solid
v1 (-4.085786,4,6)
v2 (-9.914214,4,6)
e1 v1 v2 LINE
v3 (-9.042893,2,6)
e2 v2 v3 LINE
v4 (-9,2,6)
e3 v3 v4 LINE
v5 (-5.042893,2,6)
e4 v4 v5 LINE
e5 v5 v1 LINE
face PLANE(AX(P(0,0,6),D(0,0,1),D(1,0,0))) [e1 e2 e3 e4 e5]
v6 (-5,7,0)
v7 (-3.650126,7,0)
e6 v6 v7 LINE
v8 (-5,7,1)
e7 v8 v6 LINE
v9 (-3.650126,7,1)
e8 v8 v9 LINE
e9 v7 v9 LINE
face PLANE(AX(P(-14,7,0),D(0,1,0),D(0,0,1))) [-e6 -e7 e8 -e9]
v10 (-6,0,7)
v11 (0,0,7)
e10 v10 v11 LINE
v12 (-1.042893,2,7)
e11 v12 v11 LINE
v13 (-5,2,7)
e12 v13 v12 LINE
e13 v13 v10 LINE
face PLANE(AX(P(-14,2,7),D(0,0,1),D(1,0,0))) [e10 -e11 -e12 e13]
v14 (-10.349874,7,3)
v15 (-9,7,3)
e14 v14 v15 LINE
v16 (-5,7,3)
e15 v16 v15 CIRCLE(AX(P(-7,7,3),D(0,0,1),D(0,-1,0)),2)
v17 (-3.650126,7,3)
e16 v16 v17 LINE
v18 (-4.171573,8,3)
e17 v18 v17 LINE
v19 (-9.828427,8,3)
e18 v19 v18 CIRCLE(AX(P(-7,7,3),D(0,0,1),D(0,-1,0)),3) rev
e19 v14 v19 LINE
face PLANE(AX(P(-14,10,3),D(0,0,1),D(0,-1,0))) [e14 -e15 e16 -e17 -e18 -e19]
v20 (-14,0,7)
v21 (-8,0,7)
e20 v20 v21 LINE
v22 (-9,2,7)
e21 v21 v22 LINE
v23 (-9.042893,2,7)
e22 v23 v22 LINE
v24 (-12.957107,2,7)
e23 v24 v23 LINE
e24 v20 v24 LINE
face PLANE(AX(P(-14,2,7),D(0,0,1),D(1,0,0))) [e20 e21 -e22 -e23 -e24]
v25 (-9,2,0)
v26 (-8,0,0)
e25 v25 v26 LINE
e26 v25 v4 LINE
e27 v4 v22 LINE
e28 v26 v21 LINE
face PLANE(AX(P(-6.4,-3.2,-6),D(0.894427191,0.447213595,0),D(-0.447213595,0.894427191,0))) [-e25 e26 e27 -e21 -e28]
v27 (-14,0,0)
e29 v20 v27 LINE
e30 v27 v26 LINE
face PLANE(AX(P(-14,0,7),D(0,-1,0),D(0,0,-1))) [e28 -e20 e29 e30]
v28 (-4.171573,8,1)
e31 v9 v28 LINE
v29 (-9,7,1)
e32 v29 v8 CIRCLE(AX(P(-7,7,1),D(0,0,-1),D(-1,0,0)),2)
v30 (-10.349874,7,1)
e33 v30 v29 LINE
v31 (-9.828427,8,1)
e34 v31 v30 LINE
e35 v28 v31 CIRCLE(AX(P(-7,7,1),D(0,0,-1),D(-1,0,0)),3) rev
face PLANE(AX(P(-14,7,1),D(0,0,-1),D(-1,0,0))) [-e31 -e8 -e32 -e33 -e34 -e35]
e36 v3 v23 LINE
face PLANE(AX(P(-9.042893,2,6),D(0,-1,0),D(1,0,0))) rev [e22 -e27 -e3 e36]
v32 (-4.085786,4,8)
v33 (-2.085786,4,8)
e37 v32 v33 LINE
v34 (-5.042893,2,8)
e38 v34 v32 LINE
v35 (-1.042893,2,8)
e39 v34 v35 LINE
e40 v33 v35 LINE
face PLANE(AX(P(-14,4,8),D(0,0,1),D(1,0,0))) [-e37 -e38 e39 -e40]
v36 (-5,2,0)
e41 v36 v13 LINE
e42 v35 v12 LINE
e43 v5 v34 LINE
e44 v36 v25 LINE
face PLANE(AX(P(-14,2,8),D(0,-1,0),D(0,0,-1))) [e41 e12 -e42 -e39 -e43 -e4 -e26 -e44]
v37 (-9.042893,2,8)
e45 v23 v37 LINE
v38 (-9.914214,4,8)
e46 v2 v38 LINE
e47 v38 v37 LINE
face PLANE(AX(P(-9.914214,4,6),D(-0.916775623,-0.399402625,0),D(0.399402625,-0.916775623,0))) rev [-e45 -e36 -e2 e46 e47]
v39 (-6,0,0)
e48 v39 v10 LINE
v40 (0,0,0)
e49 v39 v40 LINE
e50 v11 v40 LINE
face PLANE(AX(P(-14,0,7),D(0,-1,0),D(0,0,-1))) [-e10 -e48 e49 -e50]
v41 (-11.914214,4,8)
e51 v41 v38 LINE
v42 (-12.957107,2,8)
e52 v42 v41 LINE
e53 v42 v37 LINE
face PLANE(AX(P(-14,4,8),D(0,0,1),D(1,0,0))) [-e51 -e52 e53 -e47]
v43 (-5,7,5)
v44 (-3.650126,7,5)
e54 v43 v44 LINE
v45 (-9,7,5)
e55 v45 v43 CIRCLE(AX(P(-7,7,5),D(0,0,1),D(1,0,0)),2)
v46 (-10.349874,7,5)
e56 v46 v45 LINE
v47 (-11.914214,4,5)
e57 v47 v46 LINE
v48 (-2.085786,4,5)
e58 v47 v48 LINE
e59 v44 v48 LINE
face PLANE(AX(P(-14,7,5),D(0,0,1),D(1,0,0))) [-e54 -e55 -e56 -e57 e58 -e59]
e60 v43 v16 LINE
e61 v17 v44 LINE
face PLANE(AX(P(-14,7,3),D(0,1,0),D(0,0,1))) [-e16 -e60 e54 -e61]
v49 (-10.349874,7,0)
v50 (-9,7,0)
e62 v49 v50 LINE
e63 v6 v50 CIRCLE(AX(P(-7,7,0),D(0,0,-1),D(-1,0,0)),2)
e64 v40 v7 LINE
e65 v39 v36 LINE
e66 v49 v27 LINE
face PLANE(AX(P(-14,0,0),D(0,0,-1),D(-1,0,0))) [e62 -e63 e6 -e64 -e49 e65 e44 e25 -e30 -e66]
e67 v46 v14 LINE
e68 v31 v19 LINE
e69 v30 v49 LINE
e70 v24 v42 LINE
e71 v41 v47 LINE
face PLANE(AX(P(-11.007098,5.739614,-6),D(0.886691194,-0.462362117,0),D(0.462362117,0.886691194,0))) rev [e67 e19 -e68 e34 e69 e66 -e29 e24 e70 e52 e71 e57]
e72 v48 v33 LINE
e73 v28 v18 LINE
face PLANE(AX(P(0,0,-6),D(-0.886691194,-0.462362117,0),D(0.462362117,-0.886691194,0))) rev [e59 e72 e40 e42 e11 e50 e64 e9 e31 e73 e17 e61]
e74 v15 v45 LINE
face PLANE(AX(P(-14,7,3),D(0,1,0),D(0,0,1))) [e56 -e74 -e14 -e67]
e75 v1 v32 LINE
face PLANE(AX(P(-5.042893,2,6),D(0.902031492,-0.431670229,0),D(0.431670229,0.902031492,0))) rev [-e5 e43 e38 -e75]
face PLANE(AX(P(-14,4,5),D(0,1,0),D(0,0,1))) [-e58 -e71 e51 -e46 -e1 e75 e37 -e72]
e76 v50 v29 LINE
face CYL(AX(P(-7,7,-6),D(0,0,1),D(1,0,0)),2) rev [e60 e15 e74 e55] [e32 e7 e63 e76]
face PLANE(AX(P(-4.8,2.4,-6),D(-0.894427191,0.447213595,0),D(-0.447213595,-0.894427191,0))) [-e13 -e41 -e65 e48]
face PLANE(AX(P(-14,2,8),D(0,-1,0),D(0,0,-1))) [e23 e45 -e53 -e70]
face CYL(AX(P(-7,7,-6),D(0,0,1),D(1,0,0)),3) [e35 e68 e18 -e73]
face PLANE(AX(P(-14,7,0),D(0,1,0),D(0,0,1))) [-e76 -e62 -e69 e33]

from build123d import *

# Parameters (mm, degrees)
BOSS_EXTRUDE1_DEPTH    = 14
CUT_EXTRUDE1_START     = -8
CUT_EXTRUDE1_OUTLINE_R = 2
CUT_EXTRUDE1_DEPTH     = 8
CUT_EXTRUDE2_DEPTH     = 2


# Read off the part's stored shape, not the designer's step: Cut-Extrude1
with BuildPart() as part:
    # Sketch2 → Boss-Extrude1 (new body)
    with BuildSketch(Plane(origin=(0, 0, 0), x_dir=(0, 0, -1), z_dir=(1, 0, 0))):
        Polygon((0, 0), (0, 7), (-1, 7), (-1, 10), (-3, 10), (-3, 7), (-5, 7), (-5, 4), (-8, 4), (-8, 2), (-7, 2), (-7, 0), align=None)
    extrude(amount=-BOSS_EXTRUDE1_DEPTH)

    # Cut-Extrude1 outline → Cut-Extrude1 (cut)
    with BuildSketch(Plane.XY.offset(8).offset(CUT_EXTRUDE1_START)):
        with BuildLine():
            Line((-14, 0), (-9.828427125, 8))
            ThreePointArc((-9.828427125, 8), (-8.732050808, 9.449489743), (-7, 10))
            Line((-7, 10), (-14, 10))
            Line((-14, 10), (-14, 0))
        make_face()
        Polygon((-5, 2), (-9, 2), (-8, 0), (-6, 0), align=None)
        with BuildLine():
            Line((0, 0), (0, 10))
            Line((0, 10), (-7, 10))
            ThreePointArc((-7, 10), (-5.267949192, 9.449489743), (-4.171572875, 8))
            Line((-4.171572875, 8), (0, 0))
        make_face()
        with Locations((-7, 7)):
            Circle(CUT_EXTRUDE1_OUTLINE_R)
    extrude(amount=CUT_EXTRUDE1_DEPTH, mode=Mode.SUBTRACT)

    # Sketch4 → Cut-Extrude2 (cut)
    with BuildSketch(Plane.XY.offset(8)):
        Polygon((-9.914213562, 4), (-9.042893219, 2), (-5.042893219, 2), (-4.085786438, 4), align=None)
    extrude(amount=-CUT_EXTRUDE2_DEPTH, mode=Mode.SUBTRACT)


solid = part.part
